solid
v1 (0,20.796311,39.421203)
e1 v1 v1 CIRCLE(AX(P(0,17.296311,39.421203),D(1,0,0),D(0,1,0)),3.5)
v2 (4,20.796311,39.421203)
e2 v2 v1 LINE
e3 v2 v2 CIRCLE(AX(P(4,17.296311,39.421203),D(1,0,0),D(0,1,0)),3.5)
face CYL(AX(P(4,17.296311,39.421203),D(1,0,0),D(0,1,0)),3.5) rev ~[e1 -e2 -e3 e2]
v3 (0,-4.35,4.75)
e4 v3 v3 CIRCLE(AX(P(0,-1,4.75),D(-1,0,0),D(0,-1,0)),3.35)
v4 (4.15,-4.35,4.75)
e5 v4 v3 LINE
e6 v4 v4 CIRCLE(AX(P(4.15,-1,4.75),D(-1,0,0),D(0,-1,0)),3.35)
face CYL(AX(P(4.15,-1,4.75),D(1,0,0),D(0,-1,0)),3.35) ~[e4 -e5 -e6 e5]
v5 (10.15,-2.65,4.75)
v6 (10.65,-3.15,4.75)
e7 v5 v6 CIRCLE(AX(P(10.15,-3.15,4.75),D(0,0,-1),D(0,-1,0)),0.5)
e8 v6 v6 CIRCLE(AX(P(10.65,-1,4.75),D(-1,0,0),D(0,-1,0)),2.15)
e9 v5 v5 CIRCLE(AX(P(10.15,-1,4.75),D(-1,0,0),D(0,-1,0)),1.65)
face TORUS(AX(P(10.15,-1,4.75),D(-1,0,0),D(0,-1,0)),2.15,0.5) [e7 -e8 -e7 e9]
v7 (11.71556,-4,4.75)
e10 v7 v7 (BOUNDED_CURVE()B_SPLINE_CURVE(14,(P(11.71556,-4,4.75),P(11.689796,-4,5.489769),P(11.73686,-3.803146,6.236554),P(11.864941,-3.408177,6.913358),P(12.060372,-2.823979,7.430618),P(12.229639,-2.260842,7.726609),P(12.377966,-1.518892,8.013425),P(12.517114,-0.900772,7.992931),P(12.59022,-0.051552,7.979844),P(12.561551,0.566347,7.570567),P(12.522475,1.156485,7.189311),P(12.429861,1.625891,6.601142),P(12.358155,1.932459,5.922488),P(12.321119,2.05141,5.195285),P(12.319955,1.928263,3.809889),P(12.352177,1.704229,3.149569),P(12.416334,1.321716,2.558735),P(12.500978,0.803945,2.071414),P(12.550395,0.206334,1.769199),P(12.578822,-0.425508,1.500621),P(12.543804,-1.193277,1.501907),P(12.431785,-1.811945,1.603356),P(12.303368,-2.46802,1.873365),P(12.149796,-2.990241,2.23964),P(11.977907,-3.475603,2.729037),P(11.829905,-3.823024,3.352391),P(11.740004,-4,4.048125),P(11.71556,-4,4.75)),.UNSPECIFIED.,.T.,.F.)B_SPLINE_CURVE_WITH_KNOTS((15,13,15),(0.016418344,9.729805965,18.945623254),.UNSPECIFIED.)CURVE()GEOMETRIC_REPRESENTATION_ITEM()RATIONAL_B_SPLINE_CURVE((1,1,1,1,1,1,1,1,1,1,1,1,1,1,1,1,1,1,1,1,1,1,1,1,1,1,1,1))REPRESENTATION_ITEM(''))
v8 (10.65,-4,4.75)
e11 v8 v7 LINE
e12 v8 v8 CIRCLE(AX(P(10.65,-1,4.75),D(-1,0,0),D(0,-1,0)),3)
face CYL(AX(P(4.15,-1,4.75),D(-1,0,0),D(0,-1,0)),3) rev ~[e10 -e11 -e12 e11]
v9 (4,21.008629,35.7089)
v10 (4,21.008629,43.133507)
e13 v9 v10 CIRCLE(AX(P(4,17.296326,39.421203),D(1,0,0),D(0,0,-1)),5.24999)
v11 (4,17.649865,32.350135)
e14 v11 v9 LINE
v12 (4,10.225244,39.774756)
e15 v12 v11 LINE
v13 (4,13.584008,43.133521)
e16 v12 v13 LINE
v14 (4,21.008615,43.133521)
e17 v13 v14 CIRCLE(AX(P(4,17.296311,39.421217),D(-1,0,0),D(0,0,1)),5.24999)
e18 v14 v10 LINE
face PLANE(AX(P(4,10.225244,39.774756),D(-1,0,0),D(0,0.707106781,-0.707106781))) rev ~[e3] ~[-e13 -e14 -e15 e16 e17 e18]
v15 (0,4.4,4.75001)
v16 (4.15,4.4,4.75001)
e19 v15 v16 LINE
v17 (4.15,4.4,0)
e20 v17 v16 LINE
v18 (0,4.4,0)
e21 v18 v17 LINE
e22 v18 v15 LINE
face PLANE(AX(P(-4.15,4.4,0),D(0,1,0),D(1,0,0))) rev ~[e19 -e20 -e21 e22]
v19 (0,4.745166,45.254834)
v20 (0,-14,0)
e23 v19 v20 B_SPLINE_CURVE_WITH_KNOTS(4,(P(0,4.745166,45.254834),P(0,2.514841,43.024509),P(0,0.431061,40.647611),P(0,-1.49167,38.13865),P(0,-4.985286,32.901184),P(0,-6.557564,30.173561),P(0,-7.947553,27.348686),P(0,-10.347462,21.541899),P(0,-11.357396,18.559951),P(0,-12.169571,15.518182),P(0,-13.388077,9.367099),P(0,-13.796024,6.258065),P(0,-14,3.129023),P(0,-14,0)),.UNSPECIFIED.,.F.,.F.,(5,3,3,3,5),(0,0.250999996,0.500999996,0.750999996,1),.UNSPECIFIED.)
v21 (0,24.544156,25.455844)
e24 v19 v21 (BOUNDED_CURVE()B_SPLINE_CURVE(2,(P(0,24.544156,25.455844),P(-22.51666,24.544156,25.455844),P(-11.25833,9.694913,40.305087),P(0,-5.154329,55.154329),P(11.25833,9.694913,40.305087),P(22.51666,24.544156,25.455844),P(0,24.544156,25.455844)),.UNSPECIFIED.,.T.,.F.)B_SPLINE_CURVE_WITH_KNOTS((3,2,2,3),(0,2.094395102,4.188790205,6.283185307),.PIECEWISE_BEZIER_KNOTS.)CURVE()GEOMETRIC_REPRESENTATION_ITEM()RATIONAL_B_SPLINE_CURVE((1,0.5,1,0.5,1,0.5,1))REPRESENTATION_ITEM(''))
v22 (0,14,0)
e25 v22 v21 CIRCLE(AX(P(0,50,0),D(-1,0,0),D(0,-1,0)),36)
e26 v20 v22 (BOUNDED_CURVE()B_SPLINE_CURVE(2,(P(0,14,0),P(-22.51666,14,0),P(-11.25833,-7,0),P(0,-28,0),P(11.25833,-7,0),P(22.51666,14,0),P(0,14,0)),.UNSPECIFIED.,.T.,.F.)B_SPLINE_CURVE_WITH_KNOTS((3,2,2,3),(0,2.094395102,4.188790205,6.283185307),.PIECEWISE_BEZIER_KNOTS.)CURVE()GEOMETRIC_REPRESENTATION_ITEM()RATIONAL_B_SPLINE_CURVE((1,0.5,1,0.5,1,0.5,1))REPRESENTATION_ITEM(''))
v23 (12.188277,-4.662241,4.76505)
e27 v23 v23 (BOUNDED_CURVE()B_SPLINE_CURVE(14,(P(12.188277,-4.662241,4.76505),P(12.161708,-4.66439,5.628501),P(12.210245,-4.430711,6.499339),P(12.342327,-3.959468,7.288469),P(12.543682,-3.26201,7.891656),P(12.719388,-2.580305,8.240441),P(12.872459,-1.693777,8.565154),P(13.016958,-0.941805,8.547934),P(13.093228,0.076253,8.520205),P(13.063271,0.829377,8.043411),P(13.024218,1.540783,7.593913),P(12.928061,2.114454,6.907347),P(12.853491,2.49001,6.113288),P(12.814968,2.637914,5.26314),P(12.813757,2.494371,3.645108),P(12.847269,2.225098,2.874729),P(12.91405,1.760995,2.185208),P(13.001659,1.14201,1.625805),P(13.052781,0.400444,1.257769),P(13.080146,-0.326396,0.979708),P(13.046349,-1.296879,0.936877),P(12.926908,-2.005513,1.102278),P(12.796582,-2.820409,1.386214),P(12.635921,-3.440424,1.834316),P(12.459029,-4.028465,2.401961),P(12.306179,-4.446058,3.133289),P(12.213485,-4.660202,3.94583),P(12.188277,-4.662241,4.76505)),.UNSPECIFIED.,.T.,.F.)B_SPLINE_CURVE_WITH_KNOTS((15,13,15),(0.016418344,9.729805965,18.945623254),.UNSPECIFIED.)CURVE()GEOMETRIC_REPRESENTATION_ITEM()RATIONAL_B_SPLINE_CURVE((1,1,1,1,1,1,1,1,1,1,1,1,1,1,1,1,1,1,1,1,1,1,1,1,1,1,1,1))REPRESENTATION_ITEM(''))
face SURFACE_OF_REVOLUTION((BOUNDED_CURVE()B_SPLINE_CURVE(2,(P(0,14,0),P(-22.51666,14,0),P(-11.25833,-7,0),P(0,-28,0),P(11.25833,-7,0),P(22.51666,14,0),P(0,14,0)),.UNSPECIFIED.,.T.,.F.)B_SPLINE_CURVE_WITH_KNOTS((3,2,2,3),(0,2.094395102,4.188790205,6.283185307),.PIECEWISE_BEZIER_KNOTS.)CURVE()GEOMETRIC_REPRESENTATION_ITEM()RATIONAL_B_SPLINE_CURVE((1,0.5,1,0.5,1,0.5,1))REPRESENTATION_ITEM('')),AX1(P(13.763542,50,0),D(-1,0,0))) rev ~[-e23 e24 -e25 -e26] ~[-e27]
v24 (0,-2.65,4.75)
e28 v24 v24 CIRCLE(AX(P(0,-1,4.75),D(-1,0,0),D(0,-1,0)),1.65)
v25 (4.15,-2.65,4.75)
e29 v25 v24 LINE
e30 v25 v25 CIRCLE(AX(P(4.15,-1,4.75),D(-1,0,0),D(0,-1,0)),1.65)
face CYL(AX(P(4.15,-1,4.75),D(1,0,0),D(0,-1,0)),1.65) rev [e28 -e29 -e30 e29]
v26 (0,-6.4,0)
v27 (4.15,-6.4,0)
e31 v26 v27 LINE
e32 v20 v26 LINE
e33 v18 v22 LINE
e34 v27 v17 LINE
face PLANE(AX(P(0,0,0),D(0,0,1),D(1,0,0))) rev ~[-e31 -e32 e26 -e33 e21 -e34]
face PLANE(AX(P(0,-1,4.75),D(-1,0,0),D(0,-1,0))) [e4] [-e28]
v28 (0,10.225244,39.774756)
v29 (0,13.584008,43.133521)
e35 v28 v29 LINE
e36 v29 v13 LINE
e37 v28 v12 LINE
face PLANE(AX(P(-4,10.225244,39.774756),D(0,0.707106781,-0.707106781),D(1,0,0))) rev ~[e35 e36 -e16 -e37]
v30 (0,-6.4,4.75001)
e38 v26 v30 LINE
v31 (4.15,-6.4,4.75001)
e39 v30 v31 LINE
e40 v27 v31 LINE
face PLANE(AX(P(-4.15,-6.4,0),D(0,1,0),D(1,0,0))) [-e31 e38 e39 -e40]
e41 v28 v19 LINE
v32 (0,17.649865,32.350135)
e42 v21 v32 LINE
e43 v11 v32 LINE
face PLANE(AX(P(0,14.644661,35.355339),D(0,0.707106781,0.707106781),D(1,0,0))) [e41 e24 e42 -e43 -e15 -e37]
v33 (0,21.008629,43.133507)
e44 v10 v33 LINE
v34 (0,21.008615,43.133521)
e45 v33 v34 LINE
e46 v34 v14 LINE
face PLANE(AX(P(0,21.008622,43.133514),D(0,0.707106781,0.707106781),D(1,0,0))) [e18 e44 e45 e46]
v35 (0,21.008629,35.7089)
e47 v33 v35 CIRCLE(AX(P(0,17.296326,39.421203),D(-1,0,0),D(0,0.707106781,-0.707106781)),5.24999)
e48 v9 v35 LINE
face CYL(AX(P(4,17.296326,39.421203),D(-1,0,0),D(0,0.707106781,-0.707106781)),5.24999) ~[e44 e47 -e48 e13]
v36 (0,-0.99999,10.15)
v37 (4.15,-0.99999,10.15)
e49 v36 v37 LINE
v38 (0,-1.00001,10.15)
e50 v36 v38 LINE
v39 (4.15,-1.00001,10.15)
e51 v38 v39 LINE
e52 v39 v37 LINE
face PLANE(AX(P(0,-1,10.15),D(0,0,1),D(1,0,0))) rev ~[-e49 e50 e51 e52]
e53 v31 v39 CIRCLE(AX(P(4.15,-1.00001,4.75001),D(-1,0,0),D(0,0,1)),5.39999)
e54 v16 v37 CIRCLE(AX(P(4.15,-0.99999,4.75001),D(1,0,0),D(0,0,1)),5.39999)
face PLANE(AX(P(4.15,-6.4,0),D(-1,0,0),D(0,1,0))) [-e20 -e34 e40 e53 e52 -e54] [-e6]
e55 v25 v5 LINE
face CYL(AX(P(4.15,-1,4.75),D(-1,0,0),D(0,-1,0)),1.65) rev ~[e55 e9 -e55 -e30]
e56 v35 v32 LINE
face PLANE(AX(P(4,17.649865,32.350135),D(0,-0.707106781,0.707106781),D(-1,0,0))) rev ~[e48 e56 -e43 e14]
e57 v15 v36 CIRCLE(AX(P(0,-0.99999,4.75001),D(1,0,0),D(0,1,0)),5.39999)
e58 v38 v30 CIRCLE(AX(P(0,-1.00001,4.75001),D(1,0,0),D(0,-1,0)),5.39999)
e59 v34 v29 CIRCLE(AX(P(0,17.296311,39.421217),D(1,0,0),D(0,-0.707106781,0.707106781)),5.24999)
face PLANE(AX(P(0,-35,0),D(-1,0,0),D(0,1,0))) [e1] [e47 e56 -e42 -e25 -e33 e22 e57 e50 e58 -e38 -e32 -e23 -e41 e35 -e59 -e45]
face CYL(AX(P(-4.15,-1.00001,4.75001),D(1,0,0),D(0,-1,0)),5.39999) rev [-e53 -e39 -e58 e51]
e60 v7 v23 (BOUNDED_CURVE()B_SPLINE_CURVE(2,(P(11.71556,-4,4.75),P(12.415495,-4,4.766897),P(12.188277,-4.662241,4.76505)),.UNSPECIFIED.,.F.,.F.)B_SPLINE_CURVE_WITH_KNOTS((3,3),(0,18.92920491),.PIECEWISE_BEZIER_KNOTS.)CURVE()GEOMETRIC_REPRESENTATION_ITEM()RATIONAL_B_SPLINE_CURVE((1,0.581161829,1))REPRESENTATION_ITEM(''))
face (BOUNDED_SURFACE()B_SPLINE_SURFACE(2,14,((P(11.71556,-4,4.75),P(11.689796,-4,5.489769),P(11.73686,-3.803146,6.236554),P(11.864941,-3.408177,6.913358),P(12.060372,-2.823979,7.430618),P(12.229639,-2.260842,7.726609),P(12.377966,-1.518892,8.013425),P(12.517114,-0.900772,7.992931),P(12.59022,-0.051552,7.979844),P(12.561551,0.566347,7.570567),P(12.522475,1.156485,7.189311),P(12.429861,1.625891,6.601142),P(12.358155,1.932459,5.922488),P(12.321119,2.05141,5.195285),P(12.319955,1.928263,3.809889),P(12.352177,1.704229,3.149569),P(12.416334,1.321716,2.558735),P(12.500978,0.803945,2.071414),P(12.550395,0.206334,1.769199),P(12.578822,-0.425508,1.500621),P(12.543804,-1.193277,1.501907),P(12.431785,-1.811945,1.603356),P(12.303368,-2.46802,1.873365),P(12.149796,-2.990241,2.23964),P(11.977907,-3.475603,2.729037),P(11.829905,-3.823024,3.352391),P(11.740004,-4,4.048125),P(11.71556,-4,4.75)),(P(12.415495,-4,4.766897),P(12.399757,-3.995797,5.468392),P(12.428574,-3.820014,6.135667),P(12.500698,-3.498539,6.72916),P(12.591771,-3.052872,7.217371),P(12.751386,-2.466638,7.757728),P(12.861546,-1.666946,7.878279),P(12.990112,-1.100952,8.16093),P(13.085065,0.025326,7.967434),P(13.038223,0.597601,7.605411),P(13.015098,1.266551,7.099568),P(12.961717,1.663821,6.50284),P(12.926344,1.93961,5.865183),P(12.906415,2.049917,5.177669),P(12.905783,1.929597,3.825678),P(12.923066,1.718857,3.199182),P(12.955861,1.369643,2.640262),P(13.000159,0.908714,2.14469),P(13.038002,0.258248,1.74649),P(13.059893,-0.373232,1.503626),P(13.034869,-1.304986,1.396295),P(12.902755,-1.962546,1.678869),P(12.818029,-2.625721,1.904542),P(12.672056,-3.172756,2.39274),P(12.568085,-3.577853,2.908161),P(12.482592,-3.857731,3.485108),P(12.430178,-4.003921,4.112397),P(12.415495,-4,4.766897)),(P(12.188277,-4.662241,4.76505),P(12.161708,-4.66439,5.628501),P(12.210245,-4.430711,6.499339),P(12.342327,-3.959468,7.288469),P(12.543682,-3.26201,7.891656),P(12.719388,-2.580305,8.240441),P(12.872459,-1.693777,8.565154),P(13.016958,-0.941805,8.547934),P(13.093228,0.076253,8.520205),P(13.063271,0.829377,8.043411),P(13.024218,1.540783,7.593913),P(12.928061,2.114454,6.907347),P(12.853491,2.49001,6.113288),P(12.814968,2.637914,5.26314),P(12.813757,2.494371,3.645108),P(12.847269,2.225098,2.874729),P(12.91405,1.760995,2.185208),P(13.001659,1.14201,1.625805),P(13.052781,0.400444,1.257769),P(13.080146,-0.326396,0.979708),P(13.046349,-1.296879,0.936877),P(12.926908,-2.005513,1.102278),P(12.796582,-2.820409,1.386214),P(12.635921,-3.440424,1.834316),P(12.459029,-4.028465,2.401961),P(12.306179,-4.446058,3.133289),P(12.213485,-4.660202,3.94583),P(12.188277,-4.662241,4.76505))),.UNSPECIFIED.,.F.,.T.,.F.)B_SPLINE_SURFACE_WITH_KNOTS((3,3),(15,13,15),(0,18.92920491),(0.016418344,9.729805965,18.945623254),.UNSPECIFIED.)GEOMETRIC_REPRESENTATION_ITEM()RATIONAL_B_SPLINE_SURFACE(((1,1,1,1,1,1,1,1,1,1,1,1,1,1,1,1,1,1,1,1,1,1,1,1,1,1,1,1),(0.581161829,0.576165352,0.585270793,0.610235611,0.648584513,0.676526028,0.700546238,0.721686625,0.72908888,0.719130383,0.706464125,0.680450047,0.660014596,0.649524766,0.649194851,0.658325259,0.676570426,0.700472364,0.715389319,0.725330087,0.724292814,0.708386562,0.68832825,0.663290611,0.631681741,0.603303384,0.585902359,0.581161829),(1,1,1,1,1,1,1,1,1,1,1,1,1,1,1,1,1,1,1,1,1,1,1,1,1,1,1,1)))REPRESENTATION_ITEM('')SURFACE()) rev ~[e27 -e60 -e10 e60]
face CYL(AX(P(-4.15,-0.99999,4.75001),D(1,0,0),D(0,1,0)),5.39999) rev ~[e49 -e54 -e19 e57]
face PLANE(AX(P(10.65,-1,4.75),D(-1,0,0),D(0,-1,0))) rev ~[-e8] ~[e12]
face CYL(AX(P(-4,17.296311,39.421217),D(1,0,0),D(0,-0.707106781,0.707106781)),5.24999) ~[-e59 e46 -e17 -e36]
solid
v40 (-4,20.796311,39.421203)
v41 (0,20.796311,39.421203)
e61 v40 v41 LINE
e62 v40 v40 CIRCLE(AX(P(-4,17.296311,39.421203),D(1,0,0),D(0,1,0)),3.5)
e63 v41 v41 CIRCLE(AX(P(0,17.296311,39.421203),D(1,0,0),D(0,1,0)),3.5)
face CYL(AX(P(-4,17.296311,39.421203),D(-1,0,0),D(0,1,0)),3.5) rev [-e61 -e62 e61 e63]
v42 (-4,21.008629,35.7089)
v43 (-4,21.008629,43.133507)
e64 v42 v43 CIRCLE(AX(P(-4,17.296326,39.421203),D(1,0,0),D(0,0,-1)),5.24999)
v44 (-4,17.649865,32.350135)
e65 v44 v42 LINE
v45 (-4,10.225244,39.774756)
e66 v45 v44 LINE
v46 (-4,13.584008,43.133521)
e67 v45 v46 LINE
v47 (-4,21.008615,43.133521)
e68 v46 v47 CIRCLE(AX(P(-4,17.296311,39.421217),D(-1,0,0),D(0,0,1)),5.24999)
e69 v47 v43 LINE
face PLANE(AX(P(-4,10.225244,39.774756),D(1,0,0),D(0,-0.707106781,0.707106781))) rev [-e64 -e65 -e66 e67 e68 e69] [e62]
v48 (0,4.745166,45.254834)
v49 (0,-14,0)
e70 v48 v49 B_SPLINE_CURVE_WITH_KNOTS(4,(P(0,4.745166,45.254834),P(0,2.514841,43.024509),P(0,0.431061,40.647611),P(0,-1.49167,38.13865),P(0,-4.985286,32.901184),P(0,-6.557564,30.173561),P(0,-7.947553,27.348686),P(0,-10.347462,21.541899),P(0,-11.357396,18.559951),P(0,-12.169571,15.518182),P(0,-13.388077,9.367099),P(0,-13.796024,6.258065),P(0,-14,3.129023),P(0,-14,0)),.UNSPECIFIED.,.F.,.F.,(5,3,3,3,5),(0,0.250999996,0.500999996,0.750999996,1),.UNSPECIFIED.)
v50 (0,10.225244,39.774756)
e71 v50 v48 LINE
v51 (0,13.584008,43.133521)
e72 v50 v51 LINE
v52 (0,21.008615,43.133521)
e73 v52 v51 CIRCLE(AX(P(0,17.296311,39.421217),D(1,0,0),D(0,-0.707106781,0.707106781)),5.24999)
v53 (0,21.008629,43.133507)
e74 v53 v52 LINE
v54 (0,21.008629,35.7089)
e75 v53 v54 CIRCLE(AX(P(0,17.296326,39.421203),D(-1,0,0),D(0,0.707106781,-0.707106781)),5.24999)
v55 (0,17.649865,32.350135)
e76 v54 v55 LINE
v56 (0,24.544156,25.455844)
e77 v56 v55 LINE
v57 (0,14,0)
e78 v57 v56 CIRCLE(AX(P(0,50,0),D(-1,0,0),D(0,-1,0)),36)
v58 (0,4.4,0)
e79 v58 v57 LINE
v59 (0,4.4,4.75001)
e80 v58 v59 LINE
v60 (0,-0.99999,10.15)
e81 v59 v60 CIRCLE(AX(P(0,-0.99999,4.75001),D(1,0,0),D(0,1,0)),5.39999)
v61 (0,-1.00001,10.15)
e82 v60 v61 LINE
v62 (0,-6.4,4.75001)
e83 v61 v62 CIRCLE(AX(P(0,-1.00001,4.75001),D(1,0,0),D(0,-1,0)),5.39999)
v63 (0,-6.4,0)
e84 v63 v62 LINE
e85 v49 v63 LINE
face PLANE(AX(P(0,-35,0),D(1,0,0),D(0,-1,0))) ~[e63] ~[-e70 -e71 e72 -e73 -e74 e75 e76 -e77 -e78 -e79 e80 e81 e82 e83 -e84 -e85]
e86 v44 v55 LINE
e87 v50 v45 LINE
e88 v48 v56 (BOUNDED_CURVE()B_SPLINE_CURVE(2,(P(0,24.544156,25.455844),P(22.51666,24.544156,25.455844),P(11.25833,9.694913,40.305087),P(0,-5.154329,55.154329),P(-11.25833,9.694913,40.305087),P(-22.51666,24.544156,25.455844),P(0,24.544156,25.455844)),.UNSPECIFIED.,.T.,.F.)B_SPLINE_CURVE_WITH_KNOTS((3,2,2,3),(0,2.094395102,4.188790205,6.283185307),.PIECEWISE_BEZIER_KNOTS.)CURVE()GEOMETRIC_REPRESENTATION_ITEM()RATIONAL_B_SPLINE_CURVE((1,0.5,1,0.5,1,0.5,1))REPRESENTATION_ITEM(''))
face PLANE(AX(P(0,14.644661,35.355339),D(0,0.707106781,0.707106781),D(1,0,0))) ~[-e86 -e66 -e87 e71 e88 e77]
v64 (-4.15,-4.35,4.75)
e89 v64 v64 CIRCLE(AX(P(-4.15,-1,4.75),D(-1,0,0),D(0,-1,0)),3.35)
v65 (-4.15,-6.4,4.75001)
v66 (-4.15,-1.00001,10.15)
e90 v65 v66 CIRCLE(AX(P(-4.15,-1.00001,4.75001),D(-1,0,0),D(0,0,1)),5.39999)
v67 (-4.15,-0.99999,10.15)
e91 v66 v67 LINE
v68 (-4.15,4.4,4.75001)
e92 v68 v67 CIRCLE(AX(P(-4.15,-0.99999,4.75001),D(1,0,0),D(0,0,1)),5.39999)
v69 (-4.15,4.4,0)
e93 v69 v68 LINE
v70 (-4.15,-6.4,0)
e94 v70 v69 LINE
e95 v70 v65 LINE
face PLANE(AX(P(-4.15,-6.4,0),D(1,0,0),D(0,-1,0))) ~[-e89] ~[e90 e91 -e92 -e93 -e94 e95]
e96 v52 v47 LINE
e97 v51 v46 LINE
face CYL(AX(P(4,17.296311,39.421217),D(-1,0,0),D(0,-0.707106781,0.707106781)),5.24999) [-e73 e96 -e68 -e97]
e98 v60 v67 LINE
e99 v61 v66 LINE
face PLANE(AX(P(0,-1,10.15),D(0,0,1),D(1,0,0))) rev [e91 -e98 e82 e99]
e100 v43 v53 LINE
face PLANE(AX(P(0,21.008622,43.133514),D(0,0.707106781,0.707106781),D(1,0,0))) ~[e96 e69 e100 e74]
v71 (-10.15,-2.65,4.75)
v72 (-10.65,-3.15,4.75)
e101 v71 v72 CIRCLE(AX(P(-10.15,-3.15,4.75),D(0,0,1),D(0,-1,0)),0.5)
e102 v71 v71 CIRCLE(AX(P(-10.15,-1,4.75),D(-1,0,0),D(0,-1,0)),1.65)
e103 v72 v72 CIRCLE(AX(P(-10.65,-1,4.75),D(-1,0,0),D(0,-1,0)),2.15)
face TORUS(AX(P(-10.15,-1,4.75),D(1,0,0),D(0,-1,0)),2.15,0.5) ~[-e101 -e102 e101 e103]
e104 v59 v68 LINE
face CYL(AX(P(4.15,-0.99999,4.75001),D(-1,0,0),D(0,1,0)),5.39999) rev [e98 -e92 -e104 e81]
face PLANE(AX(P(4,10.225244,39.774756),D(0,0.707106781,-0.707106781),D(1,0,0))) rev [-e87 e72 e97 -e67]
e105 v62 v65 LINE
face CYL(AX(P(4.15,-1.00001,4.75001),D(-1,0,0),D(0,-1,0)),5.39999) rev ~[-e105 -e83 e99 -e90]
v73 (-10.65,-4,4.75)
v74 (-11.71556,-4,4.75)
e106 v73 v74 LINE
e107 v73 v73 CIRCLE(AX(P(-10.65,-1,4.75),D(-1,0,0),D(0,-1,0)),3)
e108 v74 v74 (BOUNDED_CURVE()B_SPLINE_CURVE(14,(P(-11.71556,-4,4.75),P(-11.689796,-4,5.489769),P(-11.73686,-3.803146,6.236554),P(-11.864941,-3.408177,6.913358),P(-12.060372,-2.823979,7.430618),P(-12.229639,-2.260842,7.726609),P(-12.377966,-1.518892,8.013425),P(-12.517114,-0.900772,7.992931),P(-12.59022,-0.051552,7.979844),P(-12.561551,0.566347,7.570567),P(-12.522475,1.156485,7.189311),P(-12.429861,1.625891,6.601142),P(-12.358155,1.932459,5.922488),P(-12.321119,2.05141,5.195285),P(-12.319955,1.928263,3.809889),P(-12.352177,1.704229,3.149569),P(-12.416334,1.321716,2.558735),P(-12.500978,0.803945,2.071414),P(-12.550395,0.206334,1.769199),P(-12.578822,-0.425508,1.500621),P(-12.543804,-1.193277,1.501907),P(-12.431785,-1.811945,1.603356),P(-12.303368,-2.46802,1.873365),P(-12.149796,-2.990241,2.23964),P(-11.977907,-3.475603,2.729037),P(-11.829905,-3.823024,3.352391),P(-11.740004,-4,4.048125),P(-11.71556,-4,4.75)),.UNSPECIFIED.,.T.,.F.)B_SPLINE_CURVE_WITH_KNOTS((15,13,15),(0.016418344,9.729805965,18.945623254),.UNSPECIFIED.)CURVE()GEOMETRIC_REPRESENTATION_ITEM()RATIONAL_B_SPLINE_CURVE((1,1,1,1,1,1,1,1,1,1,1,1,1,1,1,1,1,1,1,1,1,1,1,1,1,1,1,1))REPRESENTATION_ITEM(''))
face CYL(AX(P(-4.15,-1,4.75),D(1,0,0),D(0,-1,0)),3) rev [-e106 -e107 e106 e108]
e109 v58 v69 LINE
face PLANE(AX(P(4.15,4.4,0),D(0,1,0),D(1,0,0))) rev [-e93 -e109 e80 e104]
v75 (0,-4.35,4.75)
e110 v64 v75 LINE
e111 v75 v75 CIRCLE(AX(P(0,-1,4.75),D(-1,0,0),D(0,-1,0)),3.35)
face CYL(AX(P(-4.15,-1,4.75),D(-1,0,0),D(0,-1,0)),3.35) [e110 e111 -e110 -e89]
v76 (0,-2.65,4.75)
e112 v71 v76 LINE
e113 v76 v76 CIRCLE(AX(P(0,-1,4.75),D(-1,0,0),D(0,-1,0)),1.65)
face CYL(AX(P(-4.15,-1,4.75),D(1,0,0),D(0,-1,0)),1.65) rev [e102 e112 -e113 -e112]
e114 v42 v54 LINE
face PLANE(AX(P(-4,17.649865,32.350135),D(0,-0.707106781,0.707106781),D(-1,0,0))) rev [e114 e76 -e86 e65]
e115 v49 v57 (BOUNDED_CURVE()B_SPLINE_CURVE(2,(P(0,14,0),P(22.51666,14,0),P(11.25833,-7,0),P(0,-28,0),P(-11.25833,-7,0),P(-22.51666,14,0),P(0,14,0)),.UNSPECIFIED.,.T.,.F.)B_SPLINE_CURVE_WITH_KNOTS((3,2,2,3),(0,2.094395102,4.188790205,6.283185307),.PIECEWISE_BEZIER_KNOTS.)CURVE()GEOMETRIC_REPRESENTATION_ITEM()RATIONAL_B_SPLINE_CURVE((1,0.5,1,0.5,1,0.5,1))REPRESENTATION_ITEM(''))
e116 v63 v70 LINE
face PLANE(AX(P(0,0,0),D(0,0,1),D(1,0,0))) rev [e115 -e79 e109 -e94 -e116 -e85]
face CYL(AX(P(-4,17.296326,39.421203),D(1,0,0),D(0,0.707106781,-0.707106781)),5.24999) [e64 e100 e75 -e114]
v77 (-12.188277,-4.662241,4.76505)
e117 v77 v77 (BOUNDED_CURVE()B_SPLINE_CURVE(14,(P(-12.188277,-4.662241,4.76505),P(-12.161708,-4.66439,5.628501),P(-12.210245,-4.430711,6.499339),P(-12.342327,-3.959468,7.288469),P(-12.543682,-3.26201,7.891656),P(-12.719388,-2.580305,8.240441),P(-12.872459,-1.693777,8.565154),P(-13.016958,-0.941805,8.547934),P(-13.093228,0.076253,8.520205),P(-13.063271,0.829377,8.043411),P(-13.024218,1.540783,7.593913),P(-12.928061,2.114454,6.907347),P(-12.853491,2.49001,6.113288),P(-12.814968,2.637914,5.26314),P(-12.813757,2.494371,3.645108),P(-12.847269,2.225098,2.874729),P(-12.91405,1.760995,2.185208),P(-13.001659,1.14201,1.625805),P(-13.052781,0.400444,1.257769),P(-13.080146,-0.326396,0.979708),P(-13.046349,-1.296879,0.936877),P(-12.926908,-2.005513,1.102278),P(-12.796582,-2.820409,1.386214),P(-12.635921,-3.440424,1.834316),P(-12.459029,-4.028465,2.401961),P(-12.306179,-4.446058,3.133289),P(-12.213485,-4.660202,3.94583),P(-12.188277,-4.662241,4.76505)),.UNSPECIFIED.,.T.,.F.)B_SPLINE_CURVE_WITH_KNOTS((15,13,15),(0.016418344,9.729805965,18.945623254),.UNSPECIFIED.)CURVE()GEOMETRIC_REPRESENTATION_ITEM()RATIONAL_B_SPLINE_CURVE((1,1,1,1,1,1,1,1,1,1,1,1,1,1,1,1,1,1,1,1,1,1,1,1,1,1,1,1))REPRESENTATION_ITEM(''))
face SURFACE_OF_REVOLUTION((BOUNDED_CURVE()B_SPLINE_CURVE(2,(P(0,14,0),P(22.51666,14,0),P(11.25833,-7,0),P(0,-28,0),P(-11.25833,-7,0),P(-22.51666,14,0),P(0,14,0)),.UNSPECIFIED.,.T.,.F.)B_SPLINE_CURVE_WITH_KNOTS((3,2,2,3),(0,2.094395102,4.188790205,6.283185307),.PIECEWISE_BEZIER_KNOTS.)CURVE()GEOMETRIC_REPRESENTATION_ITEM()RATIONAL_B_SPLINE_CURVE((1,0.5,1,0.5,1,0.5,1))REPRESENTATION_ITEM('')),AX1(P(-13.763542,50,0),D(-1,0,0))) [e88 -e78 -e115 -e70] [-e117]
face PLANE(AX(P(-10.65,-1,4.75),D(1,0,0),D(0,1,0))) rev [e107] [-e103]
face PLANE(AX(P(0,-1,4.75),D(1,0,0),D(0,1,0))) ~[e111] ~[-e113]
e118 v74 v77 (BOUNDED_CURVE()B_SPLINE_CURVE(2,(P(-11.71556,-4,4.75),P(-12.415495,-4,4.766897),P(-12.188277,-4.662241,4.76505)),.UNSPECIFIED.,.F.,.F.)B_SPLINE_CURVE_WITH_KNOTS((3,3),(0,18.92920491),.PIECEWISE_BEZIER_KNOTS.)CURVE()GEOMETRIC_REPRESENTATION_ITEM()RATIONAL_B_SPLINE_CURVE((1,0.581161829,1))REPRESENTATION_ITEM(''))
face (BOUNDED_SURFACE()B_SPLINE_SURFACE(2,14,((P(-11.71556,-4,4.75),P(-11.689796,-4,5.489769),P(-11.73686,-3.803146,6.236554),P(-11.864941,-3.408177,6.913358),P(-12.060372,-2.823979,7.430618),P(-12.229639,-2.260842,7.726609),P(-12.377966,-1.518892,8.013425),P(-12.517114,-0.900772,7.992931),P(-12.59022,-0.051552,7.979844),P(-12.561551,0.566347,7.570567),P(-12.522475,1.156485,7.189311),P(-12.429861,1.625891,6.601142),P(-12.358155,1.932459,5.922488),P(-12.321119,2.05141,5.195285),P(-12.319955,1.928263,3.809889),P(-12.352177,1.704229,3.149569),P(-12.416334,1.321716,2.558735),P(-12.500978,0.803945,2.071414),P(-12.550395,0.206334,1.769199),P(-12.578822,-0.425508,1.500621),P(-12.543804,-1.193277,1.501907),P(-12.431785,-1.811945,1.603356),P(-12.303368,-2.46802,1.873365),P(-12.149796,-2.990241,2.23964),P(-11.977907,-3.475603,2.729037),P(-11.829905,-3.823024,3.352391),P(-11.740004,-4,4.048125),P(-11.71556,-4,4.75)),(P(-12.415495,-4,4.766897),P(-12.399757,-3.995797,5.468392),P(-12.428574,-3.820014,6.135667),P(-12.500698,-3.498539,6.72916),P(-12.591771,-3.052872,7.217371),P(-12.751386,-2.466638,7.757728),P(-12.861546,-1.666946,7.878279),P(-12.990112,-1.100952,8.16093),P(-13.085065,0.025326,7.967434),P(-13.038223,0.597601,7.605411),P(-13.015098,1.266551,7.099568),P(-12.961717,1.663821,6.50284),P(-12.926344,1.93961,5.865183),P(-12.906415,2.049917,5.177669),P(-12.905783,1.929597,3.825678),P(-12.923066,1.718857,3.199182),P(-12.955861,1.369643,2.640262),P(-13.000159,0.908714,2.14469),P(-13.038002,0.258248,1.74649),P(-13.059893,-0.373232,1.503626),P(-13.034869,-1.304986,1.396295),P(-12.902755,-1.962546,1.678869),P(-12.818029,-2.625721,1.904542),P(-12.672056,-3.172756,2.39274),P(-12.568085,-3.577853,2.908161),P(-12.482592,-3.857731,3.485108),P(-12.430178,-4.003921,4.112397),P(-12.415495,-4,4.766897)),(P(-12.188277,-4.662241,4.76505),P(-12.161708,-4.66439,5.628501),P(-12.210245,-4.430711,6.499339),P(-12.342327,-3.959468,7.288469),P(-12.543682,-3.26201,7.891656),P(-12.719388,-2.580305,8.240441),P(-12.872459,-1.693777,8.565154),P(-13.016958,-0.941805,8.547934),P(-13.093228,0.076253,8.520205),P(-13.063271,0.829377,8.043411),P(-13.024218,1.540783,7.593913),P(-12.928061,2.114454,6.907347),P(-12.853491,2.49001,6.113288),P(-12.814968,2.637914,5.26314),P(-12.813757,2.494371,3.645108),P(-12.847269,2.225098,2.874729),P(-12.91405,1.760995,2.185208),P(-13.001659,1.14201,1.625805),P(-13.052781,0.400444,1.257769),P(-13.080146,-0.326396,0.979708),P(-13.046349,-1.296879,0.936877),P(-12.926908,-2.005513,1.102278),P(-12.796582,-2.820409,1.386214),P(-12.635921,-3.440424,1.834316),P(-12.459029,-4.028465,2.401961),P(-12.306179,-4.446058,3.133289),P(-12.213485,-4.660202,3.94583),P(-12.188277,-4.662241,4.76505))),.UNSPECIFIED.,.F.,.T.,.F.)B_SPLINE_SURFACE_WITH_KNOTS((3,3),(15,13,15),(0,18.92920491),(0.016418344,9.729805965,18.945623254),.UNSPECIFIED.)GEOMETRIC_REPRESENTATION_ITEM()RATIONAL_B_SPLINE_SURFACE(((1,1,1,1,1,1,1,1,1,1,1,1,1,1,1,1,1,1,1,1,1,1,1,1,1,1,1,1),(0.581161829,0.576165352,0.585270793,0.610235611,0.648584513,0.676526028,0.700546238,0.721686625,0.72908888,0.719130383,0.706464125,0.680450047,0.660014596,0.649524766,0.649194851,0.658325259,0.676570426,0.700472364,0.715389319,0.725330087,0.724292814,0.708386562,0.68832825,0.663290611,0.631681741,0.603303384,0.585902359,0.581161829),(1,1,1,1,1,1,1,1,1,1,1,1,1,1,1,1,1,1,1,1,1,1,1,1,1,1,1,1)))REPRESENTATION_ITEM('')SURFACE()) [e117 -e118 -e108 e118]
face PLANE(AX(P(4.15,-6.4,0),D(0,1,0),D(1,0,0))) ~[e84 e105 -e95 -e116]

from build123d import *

# Parameters (mm, degrees)
F0_W      = 8.3
F0_H      = 10.8
F1_ANGLE  = 45
F3_DEPTH  = 10
F4_R      = 5.24999
F5_R      = 3.5
F6_DEPTH  = 17.0010001
F7_DEPTH  = 10.15
F8_R      = 5.39999
F9_W      = 20
F9_H      = 70
F10_DEPTH = 50
F11_R     = 3.35
F11_R_2   = 1.65
F12_DEPTH = 4.15
F13_DEPTH = 25
F14_R     = 3
F14_R_2   = 1.65
F15_DEPTH = 25
F16_DEPTH = 6.5
F17_R     = 0.5


# Not quite as in the source:
# - a fillet or chamfer is up to 0.001 mm smaller than in the source, because OpenCascade refuses the exact size
# - a feature names something its author has since deleted; it is built from what else it names


with BuildPart() as f1:
    # F0 (on Top) → F1 (revolve)
    with BuildSketch(Plane.XY):
        with BuildLine():
            add(Edge.make_bspline(
                [(0, 14), (-22.5166604984, 14), (-11.2583302492, -7), (0, -28), (11.2583302492, -7), (22.5166604984, 14), (0, 14)],
                knots=[0, 0, 0, 2.0943951024, 2.0943951024, 4.1887902048, 4.1887902048, 6.2831853072, 6.2831853072, 6.2831853072], degree=2, weights=[1, 0.5, 1, 0.5, 1, 0.5, 1]))
        make_face()
        with Locations((0, -1)):
            Rectangle(F0_W, F0_H, mode=Mode.SUBTRACT)
        with Locations((0, -1)):
            Rectangle(F0_W, F0_H)
    revolve(axis=Axis((13.7635422871, 50, 0), (-1, 0, 0)), revolution_arc=F1_ANGLE)

    # F2 (on face) → F3 (join)
    with BuildSketch(Plane(origin=(0, 25, 25), x_dir=(1, 0, 0), z_dir=(0, 0.7071067812, 0.7071067812))):
        Polygon((0, -10.3946609407), (-4, -10.3946609407), (-4, -20.8946609407), (4, -20.8946609407), (4, -10.3946609407), align=None)
    extrude(amount=F3_DEPTH)

    # F4 (radius 5.25 in the source; OpenCascade refuses exactly that, so slightly less here)
    f4_edges = [f1.edges().sort_by_distance(p)[0] for p in [
        (0, 17.296311, 46.845824),
        (0, 24.720933, 39.421203),
    ]]
    fillet(f4_edges, radius=F4_R)

    # F5 (on face) → F6 (cut, through all)
    with BuildSketch(Plane.YZ.offset(4)):
        with Locations((17.2963113701, 39.4212030512)):
            Circle(F5_R)
    extrude(amount=-F6_DEPTH, mode=Mode.SUBTRACT)

    # F0 (on Top) → F7 (cut)
    with BuildSketch(Plane.XY):
        with Locations((0, -1)):
            Rectangle(F0_W, F0_H)
    extrude(amount=F7_DEPTH, mode=Mode.SUBTRACT)

    # F8 (radius 5.4 in the source; OpenCascade refuses exactly that, so slightly less here)
    f8_edges = [f1.edges().sort_by_distance(p)[0] for p in [
        (0, 4.4, 10.15),
        (0, -6.4, 10.15),
    ]]
    fillet(f8_edges, radius=F8_R)

    # F9 (on Top) → F10 (intersect)
    with BuildSketch(Plane.XY):
        with Locations((10, 0)):
            Rectangle(F9_W, F9_H)
    extrude(amount=F10_DEPTH, mode=Mode.INTERSECT)

    # F11 (on face) → F12 (join)
    with BuildSketch(Plane(origin=(4.15, 0, 0), x_dir=(0, -1, 0), z_dir=(-1, 0, 0))):
        with Locations((1, 4.75)):
            Circle(F11_R)
        with Locations((1, 4.75)):
            Circle(F11_R_2, mode=Mode.SUBTRACT)
    extrude(amount=F12_DEPTH)

    # F13 (cut): a face of the model
    f13_faces = [f1.faces().sort_by_distance(p)[0] for p in [
        (4.15, -1, 4.75),
    ]]
    extrude(f13_faces, amount=-F13_DEPTH, mode=Mode.SUBTRACT)

    # F14 (on face) → F15 (cut)
    with BuildSketch(Plane(origin=(4.15, 0, 0), x_dir=(0, -1, 0), z_dir=(-1, 0, 0))):
        with Locations((1, 4.75)):
            Circle(F14_R)
        with Locations((1, 4.75)):
            Circle(F14_R_2, mode=Mode.SUBTRACT)
    extrude(amount=-F15_DEPTH, mode=Mode.SUBTRACT)

    # F14 (on face) → F16 (join)
    with BuildSketch(Plane(origin=(4.15, 0, 0), x_dir=(0, -1, 0), z_dir=(-1, 0, 0))):
        with Locations((1, 4.75)):
            Circle(F14_R)
        with Locations((1, 4.75)):
            Circle(F14_R_2, mode=Mode.SUBTRACT)
    extrude(amount=-F16_DEPTH)

    # F17
    f17_edges = [f1.edges().sort_by_distance(p)[0] for p in [
        (10.65, 0.65, 4.75),
        (12.896212, 2, 4.750084),
    ]]
    fillet(f17_edges, radius=F17_R)


with BuildPart() as f18_1:
    # F18: instance of F1
    add(f1.part.mirror(Plane.YZ))


solid = Compound([f1.part, f18_1.part])
